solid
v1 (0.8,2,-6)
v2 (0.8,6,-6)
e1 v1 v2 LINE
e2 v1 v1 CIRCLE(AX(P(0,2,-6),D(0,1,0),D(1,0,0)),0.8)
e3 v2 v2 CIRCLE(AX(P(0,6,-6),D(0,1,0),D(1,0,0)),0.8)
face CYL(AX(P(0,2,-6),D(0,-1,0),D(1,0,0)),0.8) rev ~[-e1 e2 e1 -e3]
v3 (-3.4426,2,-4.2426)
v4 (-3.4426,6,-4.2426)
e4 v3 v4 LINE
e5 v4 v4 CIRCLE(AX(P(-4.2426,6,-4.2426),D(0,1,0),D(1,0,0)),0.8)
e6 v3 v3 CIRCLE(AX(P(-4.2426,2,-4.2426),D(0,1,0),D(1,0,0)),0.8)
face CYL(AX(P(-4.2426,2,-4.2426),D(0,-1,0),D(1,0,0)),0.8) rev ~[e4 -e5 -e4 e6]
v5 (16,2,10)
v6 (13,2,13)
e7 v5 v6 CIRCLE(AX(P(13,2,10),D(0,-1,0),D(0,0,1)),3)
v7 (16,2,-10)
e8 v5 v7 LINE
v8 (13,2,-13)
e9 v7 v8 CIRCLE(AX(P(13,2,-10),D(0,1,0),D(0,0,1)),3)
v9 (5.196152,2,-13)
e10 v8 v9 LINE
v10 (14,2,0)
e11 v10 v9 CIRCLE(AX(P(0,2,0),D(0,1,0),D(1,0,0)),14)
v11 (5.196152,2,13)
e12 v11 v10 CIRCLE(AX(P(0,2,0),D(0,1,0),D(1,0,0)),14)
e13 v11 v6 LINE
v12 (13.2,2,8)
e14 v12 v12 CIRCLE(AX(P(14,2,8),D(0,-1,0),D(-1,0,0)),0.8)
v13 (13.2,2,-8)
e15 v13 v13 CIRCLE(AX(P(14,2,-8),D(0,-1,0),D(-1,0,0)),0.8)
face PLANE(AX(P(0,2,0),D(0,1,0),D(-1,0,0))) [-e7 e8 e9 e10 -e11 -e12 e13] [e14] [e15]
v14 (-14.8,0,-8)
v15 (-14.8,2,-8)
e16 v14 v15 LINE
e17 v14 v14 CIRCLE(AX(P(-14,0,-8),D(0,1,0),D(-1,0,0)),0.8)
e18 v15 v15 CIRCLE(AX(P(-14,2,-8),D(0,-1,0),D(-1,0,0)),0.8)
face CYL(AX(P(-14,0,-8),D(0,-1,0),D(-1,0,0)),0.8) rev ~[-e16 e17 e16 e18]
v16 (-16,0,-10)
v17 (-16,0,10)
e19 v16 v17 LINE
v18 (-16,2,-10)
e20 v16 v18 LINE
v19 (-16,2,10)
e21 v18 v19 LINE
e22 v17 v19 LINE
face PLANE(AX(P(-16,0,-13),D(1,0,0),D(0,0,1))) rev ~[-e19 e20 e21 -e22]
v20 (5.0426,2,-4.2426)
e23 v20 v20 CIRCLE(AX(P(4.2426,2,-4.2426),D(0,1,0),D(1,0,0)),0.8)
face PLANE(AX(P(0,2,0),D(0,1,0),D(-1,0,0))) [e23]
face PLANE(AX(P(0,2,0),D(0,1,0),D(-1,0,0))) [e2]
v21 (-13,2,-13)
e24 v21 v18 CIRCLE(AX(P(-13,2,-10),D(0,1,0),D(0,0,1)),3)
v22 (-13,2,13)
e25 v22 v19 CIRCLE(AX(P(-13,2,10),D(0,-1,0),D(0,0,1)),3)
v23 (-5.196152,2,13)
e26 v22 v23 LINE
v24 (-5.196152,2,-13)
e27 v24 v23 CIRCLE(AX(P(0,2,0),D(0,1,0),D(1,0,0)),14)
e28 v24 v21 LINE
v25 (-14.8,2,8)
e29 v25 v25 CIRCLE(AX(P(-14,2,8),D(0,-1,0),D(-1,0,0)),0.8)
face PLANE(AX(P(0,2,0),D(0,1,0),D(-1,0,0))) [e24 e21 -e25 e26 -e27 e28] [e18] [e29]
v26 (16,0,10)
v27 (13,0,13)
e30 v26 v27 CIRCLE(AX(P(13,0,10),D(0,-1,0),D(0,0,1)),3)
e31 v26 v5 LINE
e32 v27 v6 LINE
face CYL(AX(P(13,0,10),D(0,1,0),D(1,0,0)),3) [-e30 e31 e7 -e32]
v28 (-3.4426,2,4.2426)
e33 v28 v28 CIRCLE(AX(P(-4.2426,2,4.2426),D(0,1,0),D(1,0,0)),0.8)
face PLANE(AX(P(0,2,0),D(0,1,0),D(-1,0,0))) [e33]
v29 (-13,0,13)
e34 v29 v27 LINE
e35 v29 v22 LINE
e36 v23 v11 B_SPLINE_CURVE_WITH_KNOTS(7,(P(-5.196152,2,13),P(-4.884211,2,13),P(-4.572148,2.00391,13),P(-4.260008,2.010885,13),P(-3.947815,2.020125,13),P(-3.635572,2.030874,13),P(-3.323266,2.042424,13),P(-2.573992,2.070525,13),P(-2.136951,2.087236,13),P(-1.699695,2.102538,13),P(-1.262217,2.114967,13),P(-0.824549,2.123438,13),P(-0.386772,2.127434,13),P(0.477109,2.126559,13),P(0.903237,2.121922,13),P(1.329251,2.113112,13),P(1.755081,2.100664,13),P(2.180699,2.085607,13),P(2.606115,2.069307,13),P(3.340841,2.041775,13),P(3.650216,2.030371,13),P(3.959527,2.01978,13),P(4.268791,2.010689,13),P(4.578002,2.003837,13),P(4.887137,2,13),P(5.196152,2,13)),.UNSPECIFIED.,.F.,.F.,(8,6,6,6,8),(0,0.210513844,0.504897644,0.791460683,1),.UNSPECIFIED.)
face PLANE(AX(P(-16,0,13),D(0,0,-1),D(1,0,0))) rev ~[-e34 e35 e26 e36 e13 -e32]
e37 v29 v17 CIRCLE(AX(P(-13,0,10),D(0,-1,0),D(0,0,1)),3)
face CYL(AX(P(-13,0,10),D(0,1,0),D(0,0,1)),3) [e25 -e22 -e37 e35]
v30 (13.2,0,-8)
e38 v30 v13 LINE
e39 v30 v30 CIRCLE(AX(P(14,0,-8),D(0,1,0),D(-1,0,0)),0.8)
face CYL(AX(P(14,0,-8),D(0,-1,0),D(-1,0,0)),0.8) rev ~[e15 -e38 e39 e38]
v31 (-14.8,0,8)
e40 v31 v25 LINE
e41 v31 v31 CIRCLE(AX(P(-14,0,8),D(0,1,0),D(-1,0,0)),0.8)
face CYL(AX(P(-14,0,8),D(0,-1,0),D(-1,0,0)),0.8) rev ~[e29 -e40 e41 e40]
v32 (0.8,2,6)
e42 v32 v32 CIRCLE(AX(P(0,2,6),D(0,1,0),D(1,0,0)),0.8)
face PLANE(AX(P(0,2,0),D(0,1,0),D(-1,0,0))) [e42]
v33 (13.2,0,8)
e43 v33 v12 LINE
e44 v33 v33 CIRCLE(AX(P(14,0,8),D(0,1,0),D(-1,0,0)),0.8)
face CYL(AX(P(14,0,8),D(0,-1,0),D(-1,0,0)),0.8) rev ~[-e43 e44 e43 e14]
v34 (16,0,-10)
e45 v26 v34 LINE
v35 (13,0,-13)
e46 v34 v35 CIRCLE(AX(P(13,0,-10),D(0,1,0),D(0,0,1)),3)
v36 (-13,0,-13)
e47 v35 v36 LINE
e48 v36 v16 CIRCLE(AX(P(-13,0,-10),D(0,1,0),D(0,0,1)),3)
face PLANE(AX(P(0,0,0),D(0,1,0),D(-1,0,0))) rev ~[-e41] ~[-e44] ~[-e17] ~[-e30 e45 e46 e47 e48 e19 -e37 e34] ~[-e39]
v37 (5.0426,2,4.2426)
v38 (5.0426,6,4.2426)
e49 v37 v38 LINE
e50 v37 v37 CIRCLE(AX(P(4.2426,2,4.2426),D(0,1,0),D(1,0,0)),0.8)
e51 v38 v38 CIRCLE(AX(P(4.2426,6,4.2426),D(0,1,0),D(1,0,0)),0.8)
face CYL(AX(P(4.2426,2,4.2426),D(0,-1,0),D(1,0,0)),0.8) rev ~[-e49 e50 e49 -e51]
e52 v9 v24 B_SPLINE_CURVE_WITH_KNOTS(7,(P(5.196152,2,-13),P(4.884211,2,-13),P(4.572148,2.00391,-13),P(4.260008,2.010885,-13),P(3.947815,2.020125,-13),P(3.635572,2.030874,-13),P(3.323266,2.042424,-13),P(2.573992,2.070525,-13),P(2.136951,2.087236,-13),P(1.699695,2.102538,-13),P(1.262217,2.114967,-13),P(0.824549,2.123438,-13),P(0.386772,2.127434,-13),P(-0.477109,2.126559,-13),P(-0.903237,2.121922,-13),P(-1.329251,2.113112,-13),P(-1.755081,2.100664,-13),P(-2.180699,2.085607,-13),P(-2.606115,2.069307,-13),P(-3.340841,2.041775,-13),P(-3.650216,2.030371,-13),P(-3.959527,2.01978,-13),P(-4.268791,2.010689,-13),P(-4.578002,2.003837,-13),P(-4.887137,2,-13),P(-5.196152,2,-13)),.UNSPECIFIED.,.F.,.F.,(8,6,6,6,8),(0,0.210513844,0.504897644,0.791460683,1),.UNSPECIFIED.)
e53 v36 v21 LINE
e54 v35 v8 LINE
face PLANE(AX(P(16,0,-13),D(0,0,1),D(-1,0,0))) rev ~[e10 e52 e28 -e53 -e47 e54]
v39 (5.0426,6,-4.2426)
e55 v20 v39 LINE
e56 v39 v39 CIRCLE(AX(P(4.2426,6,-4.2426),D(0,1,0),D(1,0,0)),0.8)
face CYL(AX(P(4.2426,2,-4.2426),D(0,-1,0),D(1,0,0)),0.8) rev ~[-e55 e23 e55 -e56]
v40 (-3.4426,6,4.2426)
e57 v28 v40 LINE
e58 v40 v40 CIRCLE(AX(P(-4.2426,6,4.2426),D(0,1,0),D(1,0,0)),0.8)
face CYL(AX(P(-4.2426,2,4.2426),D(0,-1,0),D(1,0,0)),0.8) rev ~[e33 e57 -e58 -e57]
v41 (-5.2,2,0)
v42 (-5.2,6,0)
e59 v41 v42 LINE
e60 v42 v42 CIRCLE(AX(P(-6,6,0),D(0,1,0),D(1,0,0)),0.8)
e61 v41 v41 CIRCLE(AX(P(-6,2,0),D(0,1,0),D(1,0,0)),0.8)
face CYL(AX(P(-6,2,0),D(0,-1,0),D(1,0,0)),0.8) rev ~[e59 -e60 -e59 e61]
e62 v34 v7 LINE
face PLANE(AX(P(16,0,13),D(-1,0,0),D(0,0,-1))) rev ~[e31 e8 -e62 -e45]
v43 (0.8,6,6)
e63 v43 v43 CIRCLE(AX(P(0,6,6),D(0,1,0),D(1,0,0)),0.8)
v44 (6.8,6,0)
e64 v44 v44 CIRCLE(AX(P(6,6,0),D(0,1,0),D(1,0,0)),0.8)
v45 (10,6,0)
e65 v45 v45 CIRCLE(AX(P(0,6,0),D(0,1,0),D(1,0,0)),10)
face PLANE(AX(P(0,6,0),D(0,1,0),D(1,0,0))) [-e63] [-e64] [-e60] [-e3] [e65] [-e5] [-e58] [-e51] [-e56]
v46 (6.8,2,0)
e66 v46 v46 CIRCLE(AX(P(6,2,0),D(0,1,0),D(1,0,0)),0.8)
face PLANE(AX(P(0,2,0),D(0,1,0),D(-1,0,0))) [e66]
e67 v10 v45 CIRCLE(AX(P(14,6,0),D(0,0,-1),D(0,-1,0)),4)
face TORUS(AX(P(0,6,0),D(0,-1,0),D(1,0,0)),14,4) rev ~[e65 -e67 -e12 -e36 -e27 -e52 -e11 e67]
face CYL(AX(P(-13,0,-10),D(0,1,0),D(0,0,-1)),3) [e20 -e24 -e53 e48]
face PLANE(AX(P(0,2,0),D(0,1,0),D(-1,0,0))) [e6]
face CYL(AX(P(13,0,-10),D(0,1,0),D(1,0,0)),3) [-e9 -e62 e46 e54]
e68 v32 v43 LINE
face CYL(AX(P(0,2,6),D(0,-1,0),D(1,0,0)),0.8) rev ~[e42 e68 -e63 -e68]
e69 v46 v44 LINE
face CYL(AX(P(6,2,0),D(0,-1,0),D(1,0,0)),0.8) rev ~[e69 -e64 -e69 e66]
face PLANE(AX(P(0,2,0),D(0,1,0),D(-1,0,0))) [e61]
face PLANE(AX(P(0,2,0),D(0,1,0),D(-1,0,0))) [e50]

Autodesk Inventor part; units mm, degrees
ref_plane "YZ Plane" through (0, 0, 0) normal (1, 0, 0) x (0, 1, 0)
ref_plane "XZ Plane" through (0, 0, 0) normal (0, 1, 0) x (-1, 0, 0)
ref_plane "XY Plane" through (0, 0, 0) normal (0, 0, 1) x (1, 0, 0)
sketch "スケッチ1" plane through (0, 0, 0) normal (0, 1, 0) x (-1, 0, 0)
  line L0 (-16, -13) -> (16, -13)
  line L1 (16, -13) -> (16, 13)
  line L2 (16, 13) -> (-16, 13)
  line L3 (-16, 13) -> (-16, -13)
  line L4 (-16, -13) -> (16, 13) construction
  line L5 (16, -13) -> (-16, 13) construction
  line L6 (-14, -8) -> (14, -8) construction
  line L7 (14, -8) -> (14, 8)
  line L8 (14, 8) -> (-14, 8) construction
  line L9 (-14, 8) -> (-14, -8)
  line L10 (-14, -8) -> (14, 8) construction
  line L11 (14, -8) -> (-14, 8) construction
  circle A0 centre (14, -8) radius 0.8
  circle A1 centre (14, 8) radius 0.8
  circle A2 centre (-14, -8) radius 0.8
  circle A3 centre (-14, 8) radius 0.8
  point P0 (0, 0)
  dimension "d0" = 32
  dimension "d1" = 26
  dimension "d2" = 28
  dimension "d3" = 16
  dimension "d4" = 1.6
  dimension "d5" = 1.6
  dimension "d6" = 1.6
  dimension "d7" = 1.6
extrude "押し出し1" add sketch "スケッチ1" along normal blind 2
sketch "スケッチ2" plane through (0, 2, 0) normal (0, 1, 0) x (1, 0, 0)
  circle A0 centre (0, 0) radius 6 construction
  circle A1 centre (0, 0) radius 10
  circle A2 centre (-6, 0) radius 0.8
  circle A3 centre (-4.2426, -4.2426) radius 0.8
  circle A4 centre (0, -6) radius 0.8
  circle A5 centre (4.2426, -4.2426) radius 0.8
  circle A6 centre (6, 0) radius 0.8
  circle A7 centre (4.2426, 4.2426) radius 0.8
  circle A8 centre (0, 6) radius 0.8
  circle A9 centre (-4.2426, 4.2426) radius 0.8
  dimension "d10" = 12
  dimension "d11" = 20
  dimension "d12" = 1.6
  dimension "d15" = 360
extrude "押し出し2" add sketch "スケッチ2" along normal blind 4
fillet "フィレット1" radius 4 1 edges at (-10, 2, 0)
fillet "フィレット2" radius 3 4 edges at (16, 1, 13) (16, 1, -13) (-16, 1, 13) (-16, 1, -13)
properties part number "neck"
